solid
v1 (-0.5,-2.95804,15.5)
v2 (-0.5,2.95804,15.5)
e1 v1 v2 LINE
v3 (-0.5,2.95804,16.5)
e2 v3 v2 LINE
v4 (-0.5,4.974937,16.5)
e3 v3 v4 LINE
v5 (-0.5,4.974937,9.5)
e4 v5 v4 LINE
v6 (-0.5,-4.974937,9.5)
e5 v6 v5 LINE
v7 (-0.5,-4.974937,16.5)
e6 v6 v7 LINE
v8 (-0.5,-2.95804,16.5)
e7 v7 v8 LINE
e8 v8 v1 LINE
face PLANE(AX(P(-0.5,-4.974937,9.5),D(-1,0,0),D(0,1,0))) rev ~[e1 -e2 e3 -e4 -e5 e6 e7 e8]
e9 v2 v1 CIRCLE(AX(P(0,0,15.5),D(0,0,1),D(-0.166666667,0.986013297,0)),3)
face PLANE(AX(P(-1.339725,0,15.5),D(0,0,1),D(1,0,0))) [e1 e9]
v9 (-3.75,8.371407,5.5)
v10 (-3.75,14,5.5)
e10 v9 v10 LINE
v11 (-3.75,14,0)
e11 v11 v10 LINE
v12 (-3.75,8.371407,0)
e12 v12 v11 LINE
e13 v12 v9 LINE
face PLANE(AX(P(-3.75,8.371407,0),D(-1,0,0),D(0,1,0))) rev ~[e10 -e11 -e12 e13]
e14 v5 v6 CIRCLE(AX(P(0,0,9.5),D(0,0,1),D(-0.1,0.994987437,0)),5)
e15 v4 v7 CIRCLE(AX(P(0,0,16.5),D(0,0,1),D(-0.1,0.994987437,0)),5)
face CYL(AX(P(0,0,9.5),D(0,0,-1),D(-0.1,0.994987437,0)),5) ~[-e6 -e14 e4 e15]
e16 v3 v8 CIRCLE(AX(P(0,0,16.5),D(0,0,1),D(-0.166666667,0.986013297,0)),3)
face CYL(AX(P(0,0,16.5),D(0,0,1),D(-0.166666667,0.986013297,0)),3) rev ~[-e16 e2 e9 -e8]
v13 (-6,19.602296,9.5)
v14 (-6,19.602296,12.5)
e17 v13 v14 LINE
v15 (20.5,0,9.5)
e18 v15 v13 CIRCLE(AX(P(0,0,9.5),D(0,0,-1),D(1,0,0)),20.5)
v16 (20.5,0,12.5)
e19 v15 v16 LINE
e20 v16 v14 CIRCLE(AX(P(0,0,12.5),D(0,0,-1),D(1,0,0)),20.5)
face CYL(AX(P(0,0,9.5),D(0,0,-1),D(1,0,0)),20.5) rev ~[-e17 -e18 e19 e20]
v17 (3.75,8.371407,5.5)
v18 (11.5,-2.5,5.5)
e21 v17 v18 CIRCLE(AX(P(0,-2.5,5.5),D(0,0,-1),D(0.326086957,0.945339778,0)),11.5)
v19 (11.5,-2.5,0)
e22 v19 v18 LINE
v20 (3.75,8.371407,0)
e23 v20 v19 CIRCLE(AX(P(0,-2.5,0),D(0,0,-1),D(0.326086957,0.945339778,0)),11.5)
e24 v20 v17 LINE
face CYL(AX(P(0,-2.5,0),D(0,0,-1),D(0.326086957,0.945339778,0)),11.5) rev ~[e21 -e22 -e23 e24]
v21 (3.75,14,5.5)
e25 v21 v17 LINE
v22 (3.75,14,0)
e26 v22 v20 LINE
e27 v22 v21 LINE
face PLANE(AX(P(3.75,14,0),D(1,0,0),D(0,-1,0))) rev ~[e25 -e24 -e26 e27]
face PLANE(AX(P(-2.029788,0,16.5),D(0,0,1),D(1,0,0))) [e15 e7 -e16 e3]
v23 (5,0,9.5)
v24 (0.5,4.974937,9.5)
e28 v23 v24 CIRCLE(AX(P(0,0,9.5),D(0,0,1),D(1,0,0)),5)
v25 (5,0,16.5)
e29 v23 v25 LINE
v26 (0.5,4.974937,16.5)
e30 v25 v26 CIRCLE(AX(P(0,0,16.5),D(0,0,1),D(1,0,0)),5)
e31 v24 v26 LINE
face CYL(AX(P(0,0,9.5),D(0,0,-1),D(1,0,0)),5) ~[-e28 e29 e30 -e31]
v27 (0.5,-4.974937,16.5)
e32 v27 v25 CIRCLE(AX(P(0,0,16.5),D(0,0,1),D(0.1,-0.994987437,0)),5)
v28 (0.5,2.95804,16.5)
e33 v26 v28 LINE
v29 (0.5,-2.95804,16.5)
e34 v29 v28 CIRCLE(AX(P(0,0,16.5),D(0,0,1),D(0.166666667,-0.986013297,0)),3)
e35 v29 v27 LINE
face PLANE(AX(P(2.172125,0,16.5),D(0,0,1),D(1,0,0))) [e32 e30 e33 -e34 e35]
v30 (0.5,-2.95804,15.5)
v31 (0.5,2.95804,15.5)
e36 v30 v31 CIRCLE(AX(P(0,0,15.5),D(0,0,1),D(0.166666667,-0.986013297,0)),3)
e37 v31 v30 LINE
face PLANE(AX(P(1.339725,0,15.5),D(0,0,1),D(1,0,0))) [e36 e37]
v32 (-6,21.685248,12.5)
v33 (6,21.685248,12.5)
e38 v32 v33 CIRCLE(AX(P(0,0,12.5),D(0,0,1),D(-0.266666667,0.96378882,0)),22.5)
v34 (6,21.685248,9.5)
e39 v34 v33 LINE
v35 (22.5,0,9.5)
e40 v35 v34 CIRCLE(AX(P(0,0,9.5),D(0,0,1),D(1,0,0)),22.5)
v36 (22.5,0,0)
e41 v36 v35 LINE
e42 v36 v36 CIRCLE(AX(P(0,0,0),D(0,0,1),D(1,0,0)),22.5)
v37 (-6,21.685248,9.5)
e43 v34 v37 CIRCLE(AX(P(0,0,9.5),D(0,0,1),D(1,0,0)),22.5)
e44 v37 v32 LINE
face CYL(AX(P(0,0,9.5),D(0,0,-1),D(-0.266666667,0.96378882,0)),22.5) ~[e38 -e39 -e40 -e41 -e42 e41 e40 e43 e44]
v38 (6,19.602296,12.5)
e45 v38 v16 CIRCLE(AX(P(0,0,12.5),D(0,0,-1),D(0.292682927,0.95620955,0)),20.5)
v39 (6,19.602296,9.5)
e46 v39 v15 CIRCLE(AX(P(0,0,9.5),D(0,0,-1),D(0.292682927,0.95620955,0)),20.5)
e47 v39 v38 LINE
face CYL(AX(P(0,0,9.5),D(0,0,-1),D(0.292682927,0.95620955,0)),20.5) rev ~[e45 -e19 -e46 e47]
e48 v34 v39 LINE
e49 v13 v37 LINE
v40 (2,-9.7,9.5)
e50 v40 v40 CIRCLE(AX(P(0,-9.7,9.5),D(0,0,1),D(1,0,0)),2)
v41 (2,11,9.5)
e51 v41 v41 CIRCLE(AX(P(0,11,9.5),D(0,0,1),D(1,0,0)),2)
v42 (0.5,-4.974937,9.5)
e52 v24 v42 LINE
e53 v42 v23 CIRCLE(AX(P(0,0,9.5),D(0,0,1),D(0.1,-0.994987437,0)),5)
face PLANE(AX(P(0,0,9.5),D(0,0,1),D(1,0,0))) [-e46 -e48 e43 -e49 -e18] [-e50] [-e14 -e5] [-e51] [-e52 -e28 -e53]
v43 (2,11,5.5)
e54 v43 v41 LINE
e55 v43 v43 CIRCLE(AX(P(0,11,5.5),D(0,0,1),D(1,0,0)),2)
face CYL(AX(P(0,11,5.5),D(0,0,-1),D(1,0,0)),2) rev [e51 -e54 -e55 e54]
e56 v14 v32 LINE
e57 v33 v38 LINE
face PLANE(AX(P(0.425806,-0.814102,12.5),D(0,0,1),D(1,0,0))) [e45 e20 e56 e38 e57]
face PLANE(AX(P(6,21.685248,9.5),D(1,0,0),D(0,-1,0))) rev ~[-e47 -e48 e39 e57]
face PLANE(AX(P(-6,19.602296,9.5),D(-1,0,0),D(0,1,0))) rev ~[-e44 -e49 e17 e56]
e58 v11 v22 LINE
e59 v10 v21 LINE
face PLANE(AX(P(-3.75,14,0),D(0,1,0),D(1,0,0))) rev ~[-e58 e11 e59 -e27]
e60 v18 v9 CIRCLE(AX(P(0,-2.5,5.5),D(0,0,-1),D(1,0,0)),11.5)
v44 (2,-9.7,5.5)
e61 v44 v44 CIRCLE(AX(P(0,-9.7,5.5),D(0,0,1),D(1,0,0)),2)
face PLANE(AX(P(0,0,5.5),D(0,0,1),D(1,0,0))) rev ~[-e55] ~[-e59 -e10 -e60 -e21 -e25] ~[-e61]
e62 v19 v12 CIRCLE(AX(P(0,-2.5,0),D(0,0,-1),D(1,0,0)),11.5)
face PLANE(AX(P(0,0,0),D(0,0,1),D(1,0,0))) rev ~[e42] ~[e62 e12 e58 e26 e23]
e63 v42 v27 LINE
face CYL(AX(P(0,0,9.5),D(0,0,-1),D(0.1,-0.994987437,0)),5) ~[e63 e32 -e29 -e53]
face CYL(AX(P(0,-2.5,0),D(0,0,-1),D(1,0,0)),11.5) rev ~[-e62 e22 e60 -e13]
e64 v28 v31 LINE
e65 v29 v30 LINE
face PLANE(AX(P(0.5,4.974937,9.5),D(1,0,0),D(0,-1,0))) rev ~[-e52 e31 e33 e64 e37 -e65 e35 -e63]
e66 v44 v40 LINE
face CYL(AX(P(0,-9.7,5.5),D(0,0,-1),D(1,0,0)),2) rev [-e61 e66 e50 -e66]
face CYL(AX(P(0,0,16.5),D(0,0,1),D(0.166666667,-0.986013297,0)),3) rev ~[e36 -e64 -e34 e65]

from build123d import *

# Parameters (mm, degrees)
F0_R      = 22.5
F1_DEPTH  = 5.5
F2_R      = 22.5
F2_R_2    = 2
F3_DEPTH  = 4
F5_DEPTH  = 3
F6_DEPTH  = 7
F8_DEPTH  = 1
F10_DEPTH = 1


with BuildPart() as f1:
    # F0 (on Top) → F1 (new body)
    with BuildSketch(Plane.XY):
        Circle(F0_R)
        with BuildLine():
            Line((-3.75, 14), (3.75, 14))
            Line((3.75, 14), (3.75, 8.3714074526))
            ThreePointArc((3.75, 8.3714074526), (9.3641604002, 4.1755149614), (11.5, -2.5))
            ThreePointArc((11.5, -2.5), (-6.6755149614, -11.8641604002), (-3.75, 8.3714074526))
            Line((-3.75, 8.3714074526), (-3.75, 14))
        make_face(mode=Mode.SUBTRACT)
    extrude(amount=F1_DEPTH)

    # F2 (on face) → F3 (join)
    with BuildSketch(Plane.XY.offset(5.5)):
        Circle(F2_R)
        with Locations((0, -9.7)):
            Circle(F2_R_2, mode=Mode.SUBTRACT)
        with Locations((0, 11)):
            Circle(F2_R_2, mode=Mode.SUBTRACT)
    extrude(amount=F3_DEPTH)

    # F4 (on face) → F5 (join)
    with BuildSketch(Plane.XY.offset(9.5)):
        with BuildLine():
            ThreePointArc((-6, 21.6852484422), (-13.6244265934, -17.9060045795), (22.5, 0))
            ThreePointArc((22.5, 0), (17.9060045795, 13.6244265934), (6, 21.6852484422))
            Line((6, 21.6852484422), (6, 19.6022957839))
            ThreePointArc((6, 19.6022957839), (16.4810497238, 12.1911853402), (20.5, 0))
            ThreePointArc((20.5, 0), (-12.1911853402, -16.4810497238), (-6, 19.6022957839))
            Line((-6, 19.6022957839), (-6, 21.6852484422))
        make_face()
    extrude(amount=F5_DEPTH)

    # F4 (on face) → F6 (join)
    with BuildSketch(Plane.XY.offset(9.5)):
        with BuildLine():
            Line((-0.5, -4.9749371855), (-0.5, 4.9749371855))
            ThreePointArc((-0.5, 4.9749371855), (-5, 0), (-0.5, -4.9749371855))
        make_face()
        with BuildLine():
            ThreePointArc((0.5, -4.9749371855), (3.7080992435, -3.3541019662), (5, 0))
            ThreePointArc((5, 0), (3.7080992435, 3.3541019662), (0.5, 4.9749371855))
            Line((0.5, 4.9749371855), (0.5, -4.9749371855))
        make_face()
    extrude(amount=F6_DEPTH)

    # F7 (on face) → F8 (cut)
    with BuildSketch(Plane.XY.offset(16.5)):
        with BuildLine():
            Line((-0.5, -2.9580398915), (-0.5, 2.9580398915))
            ThreePointArc((-0.5, 2.9580398915), (-3, 0), (-0.5, -2.9580398915))
        make_face()
    extrude(amount=-F8_DEPTH, mode=Mode.SUBTRACT)

    # F9 (on face) → F10 (cut)
    with BuildSketch(Plane.XY.offset(16.5)):
        with BuildLine():
            Line((0.5, 2.9580398915), (0.5, -2.9580398915))
            ThreePointArc((0.5, -2.9580398915), (3, 0), (0.5, 2.9580398915))
        make_face()
    extrude(amount=-F10_DEPTH, mode=Mode.SUBTRACT)


solid = f1.part
